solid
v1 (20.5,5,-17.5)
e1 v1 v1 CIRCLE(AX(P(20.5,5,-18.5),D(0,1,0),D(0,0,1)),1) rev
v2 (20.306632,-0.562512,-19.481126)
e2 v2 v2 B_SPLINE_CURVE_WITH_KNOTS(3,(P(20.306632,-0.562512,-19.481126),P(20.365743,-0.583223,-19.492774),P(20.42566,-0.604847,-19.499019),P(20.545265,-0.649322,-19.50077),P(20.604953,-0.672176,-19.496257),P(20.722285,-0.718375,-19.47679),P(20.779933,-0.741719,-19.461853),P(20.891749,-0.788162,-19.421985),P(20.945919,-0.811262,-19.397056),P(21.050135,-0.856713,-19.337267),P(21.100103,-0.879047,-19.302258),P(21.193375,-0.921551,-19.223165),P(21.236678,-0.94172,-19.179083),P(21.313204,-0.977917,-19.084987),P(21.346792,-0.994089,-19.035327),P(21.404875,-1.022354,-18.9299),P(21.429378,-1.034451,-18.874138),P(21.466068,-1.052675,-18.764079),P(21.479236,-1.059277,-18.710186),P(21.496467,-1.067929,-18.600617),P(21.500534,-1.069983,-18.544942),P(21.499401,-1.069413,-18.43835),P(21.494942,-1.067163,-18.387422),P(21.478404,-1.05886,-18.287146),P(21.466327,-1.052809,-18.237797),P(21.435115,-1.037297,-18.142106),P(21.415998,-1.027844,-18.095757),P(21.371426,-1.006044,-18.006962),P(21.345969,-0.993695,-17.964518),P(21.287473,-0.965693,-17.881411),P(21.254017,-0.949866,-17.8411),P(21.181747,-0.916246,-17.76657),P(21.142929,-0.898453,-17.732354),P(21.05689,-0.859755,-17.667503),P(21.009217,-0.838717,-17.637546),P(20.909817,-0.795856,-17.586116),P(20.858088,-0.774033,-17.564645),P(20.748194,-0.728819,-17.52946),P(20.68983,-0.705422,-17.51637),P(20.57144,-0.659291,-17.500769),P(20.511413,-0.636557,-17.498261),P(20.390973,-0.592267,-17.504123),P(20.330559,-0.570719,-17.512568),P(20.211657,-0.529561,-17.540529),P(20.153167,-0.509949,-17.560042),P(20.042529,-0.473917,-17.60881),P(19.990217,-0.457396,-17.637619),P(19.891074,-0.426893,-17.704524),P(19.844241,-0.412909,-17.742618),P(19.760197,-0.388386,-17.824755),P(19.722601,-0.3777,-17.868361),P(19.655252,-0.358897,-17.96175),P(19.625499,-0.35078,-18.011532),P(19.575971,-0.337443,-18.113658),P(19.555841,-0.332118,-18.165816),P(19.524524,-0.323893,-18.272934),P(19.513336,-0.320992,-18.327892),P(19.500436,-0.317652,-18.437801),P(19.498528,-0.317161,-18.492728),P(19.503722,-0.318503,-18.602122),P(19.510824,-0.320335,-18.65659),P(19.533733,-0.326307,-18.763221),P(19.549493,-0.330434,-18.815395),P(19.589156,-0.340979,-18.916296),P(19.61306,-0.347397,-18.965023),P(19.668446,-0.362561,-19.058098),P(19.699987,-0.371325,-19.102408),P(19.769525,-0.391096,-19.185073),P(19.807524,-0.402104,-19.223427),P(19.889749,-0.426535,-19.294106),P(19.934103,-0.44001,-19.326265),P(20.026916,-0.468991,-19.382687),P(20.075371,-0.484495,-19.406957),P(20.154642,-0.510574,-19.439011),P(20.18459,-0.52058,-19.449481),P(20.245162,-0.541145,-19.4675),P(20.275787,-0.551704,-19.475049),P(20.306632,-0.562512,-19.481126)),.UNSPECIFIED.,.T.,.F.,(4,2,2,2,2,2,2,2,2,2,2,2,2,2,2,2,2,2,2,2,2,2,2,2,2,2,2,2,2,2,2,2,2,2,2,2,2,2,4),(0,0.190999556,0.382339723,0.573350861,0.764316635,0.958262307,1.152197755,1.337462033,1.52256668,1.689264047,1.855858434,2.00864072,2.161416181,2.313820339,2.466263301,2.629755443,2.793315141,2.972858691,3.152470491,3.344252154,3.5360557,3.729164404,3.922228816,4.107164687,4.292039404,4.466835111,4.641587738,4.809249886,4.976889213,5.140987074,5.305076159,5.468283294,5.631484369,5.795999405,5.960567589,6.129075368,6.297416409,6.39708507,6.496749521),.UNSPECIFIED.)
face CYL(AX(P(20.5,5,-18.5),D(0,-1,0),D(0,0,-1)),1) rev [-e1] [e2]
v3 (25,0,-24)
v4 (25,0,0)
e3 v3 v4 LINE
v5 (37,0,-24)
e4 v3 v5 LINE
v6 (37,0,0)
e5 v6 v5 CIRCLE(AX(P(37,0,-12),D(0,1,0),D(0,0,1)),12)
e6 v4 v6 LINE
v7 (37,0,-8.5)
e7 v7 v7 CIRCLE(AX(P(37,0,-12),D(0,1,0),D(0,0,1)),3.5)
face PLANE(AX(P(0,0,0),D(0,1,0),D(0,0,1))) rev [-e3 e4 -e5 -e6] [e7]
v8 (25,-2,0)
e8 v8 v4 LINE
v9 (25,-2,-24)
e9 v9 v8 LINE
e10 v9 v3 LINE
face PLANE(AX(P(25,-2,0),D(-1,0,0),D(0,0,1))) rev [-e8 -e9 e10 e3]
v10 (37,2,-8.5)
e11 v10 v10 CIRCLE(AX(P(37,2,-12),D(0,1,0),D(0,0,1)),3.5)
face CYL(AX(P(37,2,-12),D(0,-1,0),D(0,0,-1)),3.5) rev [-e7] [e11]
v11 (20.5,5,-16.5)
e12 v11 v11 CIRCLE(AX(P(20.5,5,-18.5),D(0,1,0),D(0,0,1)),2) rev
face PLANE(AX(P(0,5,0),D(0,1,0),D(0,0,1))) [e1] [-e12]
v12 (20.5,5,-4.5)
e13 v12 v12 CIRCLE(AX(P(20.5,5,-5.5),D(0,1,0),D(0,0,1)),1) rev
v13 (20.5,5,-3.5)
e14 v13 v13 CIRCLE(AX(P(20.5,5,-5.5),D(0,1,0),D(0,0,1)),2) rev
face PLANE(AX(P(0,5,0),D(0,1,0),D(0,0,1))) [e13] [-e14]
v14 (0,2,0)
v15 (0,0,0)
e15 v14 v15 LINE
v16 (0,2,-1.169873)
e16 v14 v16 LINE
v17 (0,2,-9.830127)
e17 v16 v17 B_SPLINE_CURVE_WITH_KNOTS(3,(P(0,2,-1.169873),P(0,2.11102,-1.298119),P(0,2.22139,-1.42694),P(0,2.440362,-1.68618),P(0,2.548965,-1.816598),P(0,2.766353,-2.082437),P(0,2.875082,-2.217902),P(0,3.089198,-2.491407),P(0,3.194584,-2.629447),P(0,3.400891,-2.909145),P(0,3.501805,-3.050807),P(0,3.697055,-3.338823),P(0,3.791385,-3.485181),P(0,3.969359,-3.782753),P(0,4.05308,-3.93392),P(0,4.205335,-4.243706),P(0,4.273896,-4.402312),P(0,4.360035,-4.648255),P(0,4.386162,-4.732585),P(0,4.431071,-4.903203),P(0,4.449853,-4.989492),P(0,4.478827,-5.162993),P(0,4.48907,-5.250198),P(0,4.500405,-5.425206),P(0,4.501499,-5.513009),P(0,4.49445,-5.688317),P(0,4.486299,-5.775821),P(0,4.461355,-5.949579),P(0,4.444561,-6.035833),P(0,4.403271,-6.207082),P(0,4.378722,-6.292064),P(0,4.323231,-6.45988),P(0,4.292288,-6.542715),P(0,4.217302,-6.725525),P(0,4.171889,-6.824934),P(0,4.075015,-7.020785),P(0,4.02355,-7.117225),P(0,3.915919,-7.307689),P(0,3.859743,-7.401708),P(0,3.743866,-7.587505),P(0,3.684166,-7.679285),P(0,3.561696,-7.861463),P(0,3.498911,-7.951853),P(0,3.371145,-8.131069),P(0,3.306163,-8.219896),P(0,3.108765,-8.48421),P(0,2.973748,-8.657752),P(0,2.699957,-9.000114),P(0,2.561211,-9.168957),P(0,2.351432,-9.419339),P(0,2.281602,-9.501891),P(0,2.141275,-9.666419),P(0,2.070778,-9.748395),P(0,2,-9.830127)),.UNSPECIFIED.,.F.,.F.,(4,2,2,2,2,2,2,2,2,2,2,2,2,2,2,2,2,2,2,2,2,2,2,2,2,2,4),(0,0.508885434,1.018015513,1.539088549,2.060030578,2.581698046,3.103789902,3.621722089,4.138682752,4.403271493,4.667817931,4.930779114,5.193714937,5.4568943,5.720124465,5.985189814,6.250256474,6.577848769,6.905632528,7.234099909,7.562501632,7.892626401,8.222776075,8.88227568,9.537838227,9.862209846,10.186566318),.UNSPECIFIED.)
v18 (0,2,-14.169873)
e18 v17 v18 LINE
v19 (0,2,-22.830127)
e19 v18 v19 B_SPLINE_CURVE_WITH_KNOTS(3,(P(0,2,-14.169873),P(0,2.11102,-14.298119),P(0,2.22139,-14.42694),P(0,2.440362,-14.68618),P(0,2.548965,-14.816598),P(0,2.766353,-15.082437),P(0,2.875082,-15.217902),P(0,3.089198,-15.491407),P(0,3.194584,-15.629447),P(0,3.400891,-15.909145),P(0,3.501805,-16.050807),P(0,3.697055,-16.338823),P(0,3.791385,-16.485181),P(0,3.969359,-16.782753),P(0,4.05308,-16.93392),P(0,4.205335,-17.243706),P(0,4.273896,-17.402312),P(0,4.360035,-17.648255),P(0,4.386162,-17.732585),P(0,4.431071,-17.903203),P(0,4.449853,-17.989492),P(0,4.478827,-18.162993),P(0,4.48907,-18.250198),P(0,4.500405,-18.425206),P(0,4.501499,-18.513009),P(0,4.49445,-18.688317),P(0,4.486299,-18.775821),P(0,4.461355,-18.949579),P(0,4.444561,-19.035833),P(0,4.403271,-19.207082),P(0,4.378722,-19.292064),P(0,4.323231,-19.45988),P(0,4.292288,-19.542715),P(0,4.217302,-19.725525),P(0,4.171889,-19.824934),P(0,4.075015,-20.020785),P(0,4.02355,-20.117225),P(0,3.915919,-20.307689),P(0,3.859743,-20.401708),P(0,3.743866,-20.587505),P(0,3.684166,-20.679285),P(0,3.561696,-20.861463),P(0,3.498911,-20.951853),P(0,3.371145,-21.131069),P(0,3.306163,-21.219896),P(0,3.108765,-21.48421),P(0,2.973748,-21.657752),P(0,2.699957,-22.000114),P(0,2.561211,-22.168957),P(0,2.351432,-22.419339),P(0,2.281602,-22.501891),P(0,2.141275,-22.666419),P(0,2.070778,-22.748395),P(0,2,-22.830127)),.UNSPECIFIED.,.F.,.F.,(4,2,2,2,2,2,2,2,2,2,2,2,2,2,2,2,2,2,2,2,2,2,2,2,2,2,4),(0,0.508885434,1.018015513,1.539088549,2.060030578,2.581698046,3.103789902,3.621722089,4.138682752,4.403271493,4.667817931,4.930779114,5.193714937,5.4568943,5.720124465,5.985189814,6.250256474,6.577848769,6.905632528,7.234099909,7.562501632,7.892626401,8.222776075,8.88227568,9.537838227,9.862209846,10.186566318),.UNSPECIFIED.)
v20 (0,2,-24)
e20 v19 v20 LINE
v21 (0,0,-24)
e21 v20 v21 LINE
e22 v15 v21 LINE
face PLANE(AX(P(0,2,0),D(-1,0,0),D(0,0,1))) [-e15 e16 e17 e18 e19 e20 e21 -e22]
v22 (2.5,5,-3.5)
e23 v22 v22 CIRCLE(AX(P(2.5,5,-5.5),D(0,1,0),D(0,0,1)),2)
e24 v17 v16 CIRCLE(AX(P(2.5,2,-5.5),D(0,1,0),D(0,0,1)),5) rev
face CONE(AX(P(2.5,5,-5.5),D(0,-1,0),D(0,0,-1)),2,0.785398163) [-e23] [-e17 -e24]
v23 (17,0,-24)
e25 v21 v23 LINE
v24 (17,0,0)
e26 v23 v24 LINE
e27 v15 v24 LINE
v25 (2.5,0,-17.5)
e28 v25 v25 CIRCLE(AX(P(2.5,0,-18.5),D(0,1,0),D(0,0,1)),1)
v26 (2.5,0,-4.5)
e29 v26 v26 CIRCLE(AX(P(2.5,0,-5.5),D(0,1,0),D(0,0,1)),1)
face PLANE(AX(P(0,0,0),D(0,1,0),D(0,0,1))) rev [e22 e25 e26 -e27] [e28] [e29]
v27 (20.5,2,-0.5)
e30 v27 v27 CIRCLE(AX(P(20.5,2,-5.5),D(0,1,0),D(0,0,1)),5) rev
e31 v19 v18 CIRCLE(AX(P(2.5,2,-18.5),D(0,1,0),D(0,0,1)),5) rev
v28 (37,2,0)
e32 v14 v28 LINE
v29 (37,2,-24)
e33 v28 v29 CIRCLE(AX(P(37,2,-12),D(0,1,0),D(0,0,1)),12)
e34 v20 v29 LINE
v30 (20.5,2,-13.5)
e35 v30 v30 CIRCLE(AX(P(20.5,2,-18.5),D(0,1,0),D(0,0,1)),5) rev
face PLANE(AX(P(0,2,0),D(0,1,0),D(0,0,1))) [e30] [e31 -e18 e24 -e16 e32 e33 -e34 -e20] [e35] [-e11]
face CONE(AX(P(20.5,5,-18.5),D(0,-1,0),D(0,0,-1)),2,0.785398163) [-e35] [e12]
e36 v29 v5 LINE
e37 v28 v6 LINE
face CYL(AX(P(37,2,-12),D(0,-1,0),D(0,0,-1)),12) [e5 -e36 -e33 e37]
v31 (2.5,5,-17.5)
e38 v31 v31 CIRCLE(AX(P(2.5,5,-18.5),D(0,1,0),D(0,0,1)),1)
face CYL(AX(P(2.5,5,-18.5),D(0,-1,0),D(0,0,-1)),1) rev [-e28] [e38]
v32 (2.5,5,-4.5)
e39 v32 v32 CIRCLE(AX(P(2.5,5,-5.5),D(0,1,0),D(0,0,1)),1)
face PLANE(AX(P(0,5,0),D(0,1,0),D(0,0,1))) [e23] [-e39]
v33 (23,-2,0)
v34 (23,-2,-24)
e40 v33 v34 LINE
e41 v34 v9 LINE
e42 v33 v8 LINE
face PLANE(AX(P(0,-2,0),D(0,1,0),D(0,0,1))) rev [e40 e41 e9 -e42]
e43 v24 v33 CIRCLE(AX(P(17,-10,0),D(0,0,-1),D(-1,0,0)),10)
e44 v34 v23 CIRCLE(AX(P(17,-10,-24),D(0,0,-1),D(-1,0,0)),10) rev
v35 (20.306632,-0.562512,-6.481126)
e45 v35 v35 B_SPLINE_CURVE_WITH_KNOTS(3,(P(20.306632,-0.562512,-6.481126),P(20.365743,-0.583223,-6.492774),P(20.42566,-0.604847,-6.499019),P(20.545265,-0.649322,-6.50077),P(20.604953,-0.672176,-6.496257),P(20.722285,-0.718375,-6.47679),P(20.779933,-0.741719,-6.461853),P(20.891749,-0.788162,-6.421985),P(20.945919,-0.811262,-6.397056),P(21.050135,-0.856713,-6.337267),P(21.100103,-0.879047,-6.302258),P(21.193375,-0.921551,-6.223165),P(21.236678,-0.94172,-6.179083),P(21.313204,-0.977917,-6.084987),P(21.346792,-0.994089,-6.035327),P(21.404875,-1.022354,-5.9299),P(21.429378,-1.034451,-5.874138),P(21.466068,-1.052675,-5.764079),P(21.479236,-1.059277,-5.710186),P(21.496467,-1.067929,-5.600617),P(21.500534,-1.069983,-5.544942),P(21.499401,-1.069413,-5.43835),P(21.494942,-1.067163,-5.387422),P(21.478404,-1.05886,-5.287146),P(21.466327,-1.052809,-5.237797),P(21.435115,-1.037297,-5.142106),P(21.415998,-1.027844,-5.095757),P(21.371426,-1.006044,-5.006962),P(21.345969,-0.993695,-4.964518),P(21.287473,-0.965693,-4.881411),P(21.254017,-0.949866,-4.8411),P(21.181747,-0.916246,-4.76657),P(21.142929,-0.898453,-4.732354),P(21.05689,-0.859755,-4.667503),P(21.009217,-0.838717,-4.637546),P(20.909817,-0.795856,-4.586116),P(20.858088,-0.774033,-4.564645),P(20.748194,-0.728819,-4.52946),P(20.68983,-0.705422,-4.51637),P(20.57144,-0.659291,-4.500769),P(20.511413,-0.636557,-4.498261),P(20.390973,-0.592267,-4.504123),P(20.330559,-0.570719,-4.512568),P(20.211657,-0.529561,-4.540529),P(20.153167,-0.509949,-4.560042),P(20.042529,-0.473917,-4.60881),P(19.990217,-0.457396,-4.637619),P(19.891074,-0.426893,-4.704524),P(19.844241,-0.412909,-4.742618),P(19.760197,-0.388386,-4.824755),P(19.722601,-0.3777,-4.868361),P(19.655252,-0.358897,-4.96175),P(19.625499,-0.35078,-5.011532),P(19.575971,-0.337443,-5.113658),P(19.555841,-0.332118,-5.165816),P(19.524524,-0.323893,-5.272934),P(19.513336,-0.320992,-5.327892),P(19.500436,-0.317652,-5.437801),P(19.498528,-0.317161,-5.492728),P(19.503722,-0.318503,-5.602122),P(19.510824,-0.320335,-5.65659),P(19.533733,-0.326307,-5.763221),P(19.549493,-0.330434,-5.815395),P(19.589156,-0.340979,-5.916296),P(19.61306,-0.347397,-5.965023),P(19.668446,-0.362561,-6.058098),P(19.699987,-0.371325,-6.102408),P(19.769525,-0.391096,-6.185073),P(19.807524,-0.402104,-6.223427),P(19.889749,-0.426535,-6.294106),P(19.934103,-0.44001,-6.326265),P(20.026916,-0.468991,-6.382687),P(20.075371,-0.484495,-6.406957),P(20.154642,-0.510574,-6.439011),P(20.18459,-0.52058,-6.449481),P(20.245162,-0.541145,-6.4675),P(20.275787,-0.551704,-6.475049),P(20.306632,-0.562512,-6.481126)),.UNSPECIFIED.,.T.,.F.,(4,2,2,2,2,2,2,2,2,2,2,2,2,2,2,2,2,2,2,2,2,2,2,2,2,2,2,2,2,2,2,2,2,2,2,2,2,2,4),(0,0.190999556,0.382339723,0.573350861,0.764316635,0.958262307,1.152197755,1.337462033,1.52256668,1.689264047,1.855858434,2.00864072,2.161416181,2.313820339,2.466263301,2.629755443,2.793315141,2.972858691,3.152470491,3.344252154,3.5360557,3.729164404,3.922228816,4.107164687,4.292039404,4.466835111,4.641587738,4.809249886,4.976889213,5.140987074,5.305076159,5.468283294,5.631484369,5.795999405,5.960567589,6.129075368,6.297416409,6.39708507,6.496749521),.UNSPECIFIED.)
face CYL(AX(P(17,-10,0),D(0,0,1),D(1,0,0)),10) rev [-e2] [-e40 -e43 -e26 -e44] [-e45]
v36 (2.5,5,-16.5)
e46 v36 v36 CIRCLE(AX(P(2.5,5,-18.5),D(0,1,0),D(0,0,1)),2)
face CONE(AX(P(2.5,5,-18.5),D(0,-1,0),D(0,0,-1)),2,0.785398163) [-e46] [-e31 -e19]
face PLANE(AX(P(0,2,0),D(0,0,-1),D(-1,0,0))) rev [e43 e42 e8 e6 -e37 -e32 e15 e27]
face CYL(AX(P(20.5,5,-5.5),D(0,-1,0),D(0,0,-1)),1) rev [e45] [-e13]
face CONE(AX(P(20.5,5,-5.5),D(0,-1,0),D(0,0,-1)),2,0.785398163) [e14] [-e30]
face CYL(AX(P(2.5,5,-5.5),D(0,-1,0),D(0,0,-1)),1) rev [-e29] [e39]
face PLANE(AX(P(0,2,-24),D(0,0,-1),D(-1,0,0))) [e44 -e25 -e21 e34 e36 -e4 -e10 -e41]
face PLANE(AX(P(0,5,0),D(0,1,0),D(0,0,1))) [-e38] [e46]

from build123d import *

# Parameters (mm, degrees)
ESBO_O1_W                = 11.5
ESBO_O1_H                = 24
ESBO_O1_R                = 2
ESBO_O1_R_2              = 3.5
ESBO_O1_W_2              = 2
RESSALTO_EXTRUS_O1_DEPTH = 2
ESBO_O1_3_R              = 2
ESBO_O1_3_R_2            = 1
RESSALTO_EXTRUS_O2_DEPTH = 5
ESBO_O1_4_W              = 2
ESBO_O1_4_H              = 24
RESSALTO_EXTRUS_O3_DEPTH = 2
CHANFRO1_SIZE            = 3
FILETE1_R                = 10


with BuildPart() as part:
    # Esboço1 → Ressalto-extrusão1 (new body)
    # profile 1 of 4: a face of its own
    with BuildSketch(Plane(origin=(0, 0, 0), x_dir=(1, 0, 0), z_dir=(0, 1, 0))):
        with Locations((5.75, 12)):
            Rectangle(ESBO_O1_W, ESBO_O1_H)
        with Locations(Location((2.5, 5.5, 0), (0, 0, 270))):
            Circle(ESBO_O1_R, mode=Mode.SUBTRACT)
        with Locations(Location((2.5, 18.5, 0), (0, 0, 270))):
            Circle(ESBO_O1_R, mode=Mode.SUBTRACT)
    # profile 2 of 4: a face of its own
    with BuildSketch(Plane(origin=(0, 0, 0), x_dir=(1, 0, 0), z_dir=(0, 1, 0))):
        with Locations((17.25, 12)):
            Rectangle(ESBO_O1_W, ESBO_O1_H)
        with Locations(Location((20.5, 5.5, 0), (0, 0, 270))):
            Circle(ESBO_O1_R, mode=Mode.SUBTRACT)
        with Locations(Location((20.5, 18.5, 0), (0, 0, 270))):
            Circle(ESBO_O1_R, mode=Mode.SUBTRACT)
    # profile 3 of 4: a face of its own
    with BuildSketch(Plane(origin=(0, 0, 0), x_dir=(1, 0, 0), z_dir=(0, 1, 0))):
        with BuildLine():
            Line((37, 24), (25, 24))
            Line((25, 24), (25, 0))
            Line((25, 0), (37, 0))
            ThreePointArc((37, 0), (49, 12), (37, 24))
        make_face()
        with Locations(Location((37, 12, 0), (0, 0, 270))):
            Circle(ESBO_O1_R_2, mode=Mode.SUBTRACT)
    # profile 4 of 4: a face of its own
    with BuildSketch(Plane(origin=(0, 0, 0), x_dir=(1, 0, 0), z_dir=(0, 1, 0))):
        with Locations((24, 12)):
            Rectangle(ESBO_O1_W_2, ESBO_O1_H)
    extrude(amount=RESSALTO_EXTRUS_O1_DEPTH)

    # Esboço1<3> → Ressalto-extrusão2 (add)
    # profile 1 of 4: a face of its own
    with BuildSketch(Plane(origin=(0, 0, 0), x_dir=(1, 0, 0), z_dir=(0, 1, 0))):
        with Locations(Location((20.5, 18.5, 0), (0, 0, 270))):
            Circle(ESBO_O1_3_R)
        with Locations(Location((20.5, 18.5, 0), (0, 0, 270))):
            Circle(ESBO_O1_3_R_2, mode=Mode.SUBTRACT)
    # profile 2 of 4: a face of its own
    with BuildSketch(Plane(origin=(0, 0, 0), x_dir=(1, 0, 0), z_dir=(0, 1, 0))):
        with Locations(Location((2.5, 18.5, 0), (0, 0, 270))):
            Circle(ESBO_O1_3_R)
        with Locations(Location((2.5, 18.5, 0), (0, 0, 270))):
            Circle(ESBO_O1_3_R_2, mode=Mode.SUBTRACT)
    # profile 3 of 4: a face of its own
    with BuildSketch(Plane(origin=(0, 0, 0), x_dir=(1, 0, 0), z_dir=(0, 1, 0))):
        with Locations(Location((2.5, 5.5, 0), (0, 0, 270))):
            Circle(ESBO_O1_3_R)
        with Locations(Location((2.5, 5.5, 0), (0, 0, 270))):
            Circle(ESBO_O1_3_R_2, mode=Mode.SUBTRACT)
    # profile 4 of 4: a face of its own
    with BuildSketch(Plane(origin=(0, 0, 0), x_dir=(1, 0, 0), z_dir=(0, 1, 0))):
        with Locations(Location((20.5, 5.5, 0), (0, 0, 270))):
            Circle(ESBO_O1_3_R)
        with Locations(Location((20.5, 5.5, 0), (0, 0, 270))):
            Circle(ESBO_O1_3_R_2, mode=Mode.SUBTRACT)
    extrude(amount=RESSALTO_EXTRUS_O2_DEPTH)

    # Esboço1<4> → Ressalto-extrusão3 (add)
    with BuildSketch(Plane(origin=(0, 0, 0), x_dir=(1, 0, 0), z_dir=(0, 1, 0))):
        with Locations((24, 12)):
            Rectangle(ESBO_O1_4_W, ESBO_O1_4_H)
    extrude(amount=-RESSALTO_EXTRUS_O3_DEPTH)

    # Chanfro1
    # the kernel refuses this chamfer: 3 mm, written as the material it adds along each edge
    with BuildSketch(Plane(origin=(20.5, 2, -18.5), x_dir=(0, 0, 1), z_dir=(-1, 0, 0))) as chanfro1_piece_1_section:
        Polygon((2 + CHANFRO1_SIZE, 0), (2, CHANFRO1_SIZE), (2, 0), align=None)
    chanfro1_piece_1 = revolve(axis=Axis((20.5, 2, -18.5), (0, 1, 0)), mode=Mode.PRIVATE)
    chanfro1_piece_1 = split(chanfro1_piece_1, bisect_by=Plane(origin=(20.5, 5, -22.010399956), z_dir=(0, -1, 0)), keep=Keep.TOP, mode=Mode.PRIVATE)
    add(chanfro1_piece_1)
    with BuildSketch(Plane(origin=(2.5, 2, -18.5), x_dir=(0, 0, 1), z_dir=(-1, 0, 0))) as chanfro1_piece_2_section:
        Polygon((2 + CHANFRO1_SIZE, 0), (2, CHANFRO1_SIZE), (2, 0), align=None)
    chanfro1_piece_2 = revolve(axis=Axis((2.5, 2, -18.5), (0, 1, 0)), mode=Mode.PRIVATE)
    chanfro1_piece_2 = split(chanfro1_piece_2, bisect_by=Plane(origin=(0, 3.427479449, -22.012332263), z_dir=(1, 0, 0)), keep=Keep.TOP, mode=Mode.PRIVATE)
    chanfro1_piece_2 = split(chanfro1_piece_2, bisect_by=Plane(origin=(2.5, 5, -22.012332263), z_dir=(0, -1, 0)), keep=Keep.TOP, mode=Mode.PRIVATE)
    add(chanfro1_piece_2)
    with BuildSketch(Plane(origin=(2.5, 2, -5.5), x_dir=(0, 0, 1), z_dir=(-1, 0, 0))) as chanfro1_piece_3_section:
        Polygon((2 + CHANFRO1_SIZE, 0), (2, CHANFRO1_SIZE), (2, 0), align=None)
    chanfro1_piece_3 = revolve(axis=Axis((2.5, 2, -5.5), (0, 1, 0)), mode=Mode.PRIVATE)
    chanfro1_piece_3 = split(chanfro1_piece_3, bisect_by=Plane(origin=(0, 3.427479449, -9.012332263), z_dir=(1, 0, 0)), keep=Keep.TOP, mode=Mode.PRIVATE)
    chanfro1_piece_3 = split(chanfro1_piece_3, bisect_by=Plane(origin=(2.5, 5, -9.012332263), z_dir=(0, -1, 0)), keep=Keep.TOP, mode=Mode.PRIVATE)
    add(chanfro1_piece_3)
    with BuildSketch(Plane(origin=(20.5, 2, -5.5), x_dir=(0, 0, 1), z_dir=(-1, 0, 0))) as chanfro1_piece_4_section:
        Polygon((2 + CHANFRO1_SIZE, 0), (2, CHANFRO1_SIZE), (2, 0), align=None)
    chanfro1_piece_4 = revolve(axis=Axis((20.5, 2, -5.5), (0, 1, 0)), mode=Mode.PRIVATE)
    chanfro1_piece_4 = split(chanfro1_piece_4, bisect_by=Plane(origin=(20.5, 5, -9.010399956), z_dir=(0, -1, 0)), keep=Keep.TOP, mode=Mode.PRIVATE)
    add(chanfro1_piece_4)

    # Filete1
    # the kernel refuses this fillet: 10 mm, written as the material it adds along each edge
    with BuildSketch(Plane(origin=(23, 0, -24), x_dir=(-1, 0, 0), z_dir=(0, 0, 1))) as filete1_piece_1_section:
        with BuildLine():
            CenterArc((6, 10), FILETE1_R, 233.130102354, 36.869897646)
            Line((0, 2), (-0.12, 1.84))
            ThreePointArc((-0.12, 1.84), (-0.2, 1), (-0.2, 0))
            Line((-0.2, 0), (0, -0.2))
            Line((0, -0.2), (6, -0.2))
            Line((6, -0.2), (6, 0))
        make_face()
    filete1_piece_1 = extrude(amount=24, mode=Mode.PRIVATE)
    filete1_piece_1 = filete1_piece_1 - Plane(origin=(20.5, -0.461272254, -5.5), x_dir=(0, 0, 1), z_dir=(0, -1, 0)) * Cylinder(1, 73, mode=Mode.PRIVATE)
    filete1_piece_1 = filete1_piece_1 - Plane(origin=(20.5, -0.461272254, -18.5), x_dir=(0, 0, 1), z_dir=(0, -1, 0)) * Cylinder(1, 73, mode=Mode.PRIVATE)
    add(filete1_piece_1)


solid = part.part
